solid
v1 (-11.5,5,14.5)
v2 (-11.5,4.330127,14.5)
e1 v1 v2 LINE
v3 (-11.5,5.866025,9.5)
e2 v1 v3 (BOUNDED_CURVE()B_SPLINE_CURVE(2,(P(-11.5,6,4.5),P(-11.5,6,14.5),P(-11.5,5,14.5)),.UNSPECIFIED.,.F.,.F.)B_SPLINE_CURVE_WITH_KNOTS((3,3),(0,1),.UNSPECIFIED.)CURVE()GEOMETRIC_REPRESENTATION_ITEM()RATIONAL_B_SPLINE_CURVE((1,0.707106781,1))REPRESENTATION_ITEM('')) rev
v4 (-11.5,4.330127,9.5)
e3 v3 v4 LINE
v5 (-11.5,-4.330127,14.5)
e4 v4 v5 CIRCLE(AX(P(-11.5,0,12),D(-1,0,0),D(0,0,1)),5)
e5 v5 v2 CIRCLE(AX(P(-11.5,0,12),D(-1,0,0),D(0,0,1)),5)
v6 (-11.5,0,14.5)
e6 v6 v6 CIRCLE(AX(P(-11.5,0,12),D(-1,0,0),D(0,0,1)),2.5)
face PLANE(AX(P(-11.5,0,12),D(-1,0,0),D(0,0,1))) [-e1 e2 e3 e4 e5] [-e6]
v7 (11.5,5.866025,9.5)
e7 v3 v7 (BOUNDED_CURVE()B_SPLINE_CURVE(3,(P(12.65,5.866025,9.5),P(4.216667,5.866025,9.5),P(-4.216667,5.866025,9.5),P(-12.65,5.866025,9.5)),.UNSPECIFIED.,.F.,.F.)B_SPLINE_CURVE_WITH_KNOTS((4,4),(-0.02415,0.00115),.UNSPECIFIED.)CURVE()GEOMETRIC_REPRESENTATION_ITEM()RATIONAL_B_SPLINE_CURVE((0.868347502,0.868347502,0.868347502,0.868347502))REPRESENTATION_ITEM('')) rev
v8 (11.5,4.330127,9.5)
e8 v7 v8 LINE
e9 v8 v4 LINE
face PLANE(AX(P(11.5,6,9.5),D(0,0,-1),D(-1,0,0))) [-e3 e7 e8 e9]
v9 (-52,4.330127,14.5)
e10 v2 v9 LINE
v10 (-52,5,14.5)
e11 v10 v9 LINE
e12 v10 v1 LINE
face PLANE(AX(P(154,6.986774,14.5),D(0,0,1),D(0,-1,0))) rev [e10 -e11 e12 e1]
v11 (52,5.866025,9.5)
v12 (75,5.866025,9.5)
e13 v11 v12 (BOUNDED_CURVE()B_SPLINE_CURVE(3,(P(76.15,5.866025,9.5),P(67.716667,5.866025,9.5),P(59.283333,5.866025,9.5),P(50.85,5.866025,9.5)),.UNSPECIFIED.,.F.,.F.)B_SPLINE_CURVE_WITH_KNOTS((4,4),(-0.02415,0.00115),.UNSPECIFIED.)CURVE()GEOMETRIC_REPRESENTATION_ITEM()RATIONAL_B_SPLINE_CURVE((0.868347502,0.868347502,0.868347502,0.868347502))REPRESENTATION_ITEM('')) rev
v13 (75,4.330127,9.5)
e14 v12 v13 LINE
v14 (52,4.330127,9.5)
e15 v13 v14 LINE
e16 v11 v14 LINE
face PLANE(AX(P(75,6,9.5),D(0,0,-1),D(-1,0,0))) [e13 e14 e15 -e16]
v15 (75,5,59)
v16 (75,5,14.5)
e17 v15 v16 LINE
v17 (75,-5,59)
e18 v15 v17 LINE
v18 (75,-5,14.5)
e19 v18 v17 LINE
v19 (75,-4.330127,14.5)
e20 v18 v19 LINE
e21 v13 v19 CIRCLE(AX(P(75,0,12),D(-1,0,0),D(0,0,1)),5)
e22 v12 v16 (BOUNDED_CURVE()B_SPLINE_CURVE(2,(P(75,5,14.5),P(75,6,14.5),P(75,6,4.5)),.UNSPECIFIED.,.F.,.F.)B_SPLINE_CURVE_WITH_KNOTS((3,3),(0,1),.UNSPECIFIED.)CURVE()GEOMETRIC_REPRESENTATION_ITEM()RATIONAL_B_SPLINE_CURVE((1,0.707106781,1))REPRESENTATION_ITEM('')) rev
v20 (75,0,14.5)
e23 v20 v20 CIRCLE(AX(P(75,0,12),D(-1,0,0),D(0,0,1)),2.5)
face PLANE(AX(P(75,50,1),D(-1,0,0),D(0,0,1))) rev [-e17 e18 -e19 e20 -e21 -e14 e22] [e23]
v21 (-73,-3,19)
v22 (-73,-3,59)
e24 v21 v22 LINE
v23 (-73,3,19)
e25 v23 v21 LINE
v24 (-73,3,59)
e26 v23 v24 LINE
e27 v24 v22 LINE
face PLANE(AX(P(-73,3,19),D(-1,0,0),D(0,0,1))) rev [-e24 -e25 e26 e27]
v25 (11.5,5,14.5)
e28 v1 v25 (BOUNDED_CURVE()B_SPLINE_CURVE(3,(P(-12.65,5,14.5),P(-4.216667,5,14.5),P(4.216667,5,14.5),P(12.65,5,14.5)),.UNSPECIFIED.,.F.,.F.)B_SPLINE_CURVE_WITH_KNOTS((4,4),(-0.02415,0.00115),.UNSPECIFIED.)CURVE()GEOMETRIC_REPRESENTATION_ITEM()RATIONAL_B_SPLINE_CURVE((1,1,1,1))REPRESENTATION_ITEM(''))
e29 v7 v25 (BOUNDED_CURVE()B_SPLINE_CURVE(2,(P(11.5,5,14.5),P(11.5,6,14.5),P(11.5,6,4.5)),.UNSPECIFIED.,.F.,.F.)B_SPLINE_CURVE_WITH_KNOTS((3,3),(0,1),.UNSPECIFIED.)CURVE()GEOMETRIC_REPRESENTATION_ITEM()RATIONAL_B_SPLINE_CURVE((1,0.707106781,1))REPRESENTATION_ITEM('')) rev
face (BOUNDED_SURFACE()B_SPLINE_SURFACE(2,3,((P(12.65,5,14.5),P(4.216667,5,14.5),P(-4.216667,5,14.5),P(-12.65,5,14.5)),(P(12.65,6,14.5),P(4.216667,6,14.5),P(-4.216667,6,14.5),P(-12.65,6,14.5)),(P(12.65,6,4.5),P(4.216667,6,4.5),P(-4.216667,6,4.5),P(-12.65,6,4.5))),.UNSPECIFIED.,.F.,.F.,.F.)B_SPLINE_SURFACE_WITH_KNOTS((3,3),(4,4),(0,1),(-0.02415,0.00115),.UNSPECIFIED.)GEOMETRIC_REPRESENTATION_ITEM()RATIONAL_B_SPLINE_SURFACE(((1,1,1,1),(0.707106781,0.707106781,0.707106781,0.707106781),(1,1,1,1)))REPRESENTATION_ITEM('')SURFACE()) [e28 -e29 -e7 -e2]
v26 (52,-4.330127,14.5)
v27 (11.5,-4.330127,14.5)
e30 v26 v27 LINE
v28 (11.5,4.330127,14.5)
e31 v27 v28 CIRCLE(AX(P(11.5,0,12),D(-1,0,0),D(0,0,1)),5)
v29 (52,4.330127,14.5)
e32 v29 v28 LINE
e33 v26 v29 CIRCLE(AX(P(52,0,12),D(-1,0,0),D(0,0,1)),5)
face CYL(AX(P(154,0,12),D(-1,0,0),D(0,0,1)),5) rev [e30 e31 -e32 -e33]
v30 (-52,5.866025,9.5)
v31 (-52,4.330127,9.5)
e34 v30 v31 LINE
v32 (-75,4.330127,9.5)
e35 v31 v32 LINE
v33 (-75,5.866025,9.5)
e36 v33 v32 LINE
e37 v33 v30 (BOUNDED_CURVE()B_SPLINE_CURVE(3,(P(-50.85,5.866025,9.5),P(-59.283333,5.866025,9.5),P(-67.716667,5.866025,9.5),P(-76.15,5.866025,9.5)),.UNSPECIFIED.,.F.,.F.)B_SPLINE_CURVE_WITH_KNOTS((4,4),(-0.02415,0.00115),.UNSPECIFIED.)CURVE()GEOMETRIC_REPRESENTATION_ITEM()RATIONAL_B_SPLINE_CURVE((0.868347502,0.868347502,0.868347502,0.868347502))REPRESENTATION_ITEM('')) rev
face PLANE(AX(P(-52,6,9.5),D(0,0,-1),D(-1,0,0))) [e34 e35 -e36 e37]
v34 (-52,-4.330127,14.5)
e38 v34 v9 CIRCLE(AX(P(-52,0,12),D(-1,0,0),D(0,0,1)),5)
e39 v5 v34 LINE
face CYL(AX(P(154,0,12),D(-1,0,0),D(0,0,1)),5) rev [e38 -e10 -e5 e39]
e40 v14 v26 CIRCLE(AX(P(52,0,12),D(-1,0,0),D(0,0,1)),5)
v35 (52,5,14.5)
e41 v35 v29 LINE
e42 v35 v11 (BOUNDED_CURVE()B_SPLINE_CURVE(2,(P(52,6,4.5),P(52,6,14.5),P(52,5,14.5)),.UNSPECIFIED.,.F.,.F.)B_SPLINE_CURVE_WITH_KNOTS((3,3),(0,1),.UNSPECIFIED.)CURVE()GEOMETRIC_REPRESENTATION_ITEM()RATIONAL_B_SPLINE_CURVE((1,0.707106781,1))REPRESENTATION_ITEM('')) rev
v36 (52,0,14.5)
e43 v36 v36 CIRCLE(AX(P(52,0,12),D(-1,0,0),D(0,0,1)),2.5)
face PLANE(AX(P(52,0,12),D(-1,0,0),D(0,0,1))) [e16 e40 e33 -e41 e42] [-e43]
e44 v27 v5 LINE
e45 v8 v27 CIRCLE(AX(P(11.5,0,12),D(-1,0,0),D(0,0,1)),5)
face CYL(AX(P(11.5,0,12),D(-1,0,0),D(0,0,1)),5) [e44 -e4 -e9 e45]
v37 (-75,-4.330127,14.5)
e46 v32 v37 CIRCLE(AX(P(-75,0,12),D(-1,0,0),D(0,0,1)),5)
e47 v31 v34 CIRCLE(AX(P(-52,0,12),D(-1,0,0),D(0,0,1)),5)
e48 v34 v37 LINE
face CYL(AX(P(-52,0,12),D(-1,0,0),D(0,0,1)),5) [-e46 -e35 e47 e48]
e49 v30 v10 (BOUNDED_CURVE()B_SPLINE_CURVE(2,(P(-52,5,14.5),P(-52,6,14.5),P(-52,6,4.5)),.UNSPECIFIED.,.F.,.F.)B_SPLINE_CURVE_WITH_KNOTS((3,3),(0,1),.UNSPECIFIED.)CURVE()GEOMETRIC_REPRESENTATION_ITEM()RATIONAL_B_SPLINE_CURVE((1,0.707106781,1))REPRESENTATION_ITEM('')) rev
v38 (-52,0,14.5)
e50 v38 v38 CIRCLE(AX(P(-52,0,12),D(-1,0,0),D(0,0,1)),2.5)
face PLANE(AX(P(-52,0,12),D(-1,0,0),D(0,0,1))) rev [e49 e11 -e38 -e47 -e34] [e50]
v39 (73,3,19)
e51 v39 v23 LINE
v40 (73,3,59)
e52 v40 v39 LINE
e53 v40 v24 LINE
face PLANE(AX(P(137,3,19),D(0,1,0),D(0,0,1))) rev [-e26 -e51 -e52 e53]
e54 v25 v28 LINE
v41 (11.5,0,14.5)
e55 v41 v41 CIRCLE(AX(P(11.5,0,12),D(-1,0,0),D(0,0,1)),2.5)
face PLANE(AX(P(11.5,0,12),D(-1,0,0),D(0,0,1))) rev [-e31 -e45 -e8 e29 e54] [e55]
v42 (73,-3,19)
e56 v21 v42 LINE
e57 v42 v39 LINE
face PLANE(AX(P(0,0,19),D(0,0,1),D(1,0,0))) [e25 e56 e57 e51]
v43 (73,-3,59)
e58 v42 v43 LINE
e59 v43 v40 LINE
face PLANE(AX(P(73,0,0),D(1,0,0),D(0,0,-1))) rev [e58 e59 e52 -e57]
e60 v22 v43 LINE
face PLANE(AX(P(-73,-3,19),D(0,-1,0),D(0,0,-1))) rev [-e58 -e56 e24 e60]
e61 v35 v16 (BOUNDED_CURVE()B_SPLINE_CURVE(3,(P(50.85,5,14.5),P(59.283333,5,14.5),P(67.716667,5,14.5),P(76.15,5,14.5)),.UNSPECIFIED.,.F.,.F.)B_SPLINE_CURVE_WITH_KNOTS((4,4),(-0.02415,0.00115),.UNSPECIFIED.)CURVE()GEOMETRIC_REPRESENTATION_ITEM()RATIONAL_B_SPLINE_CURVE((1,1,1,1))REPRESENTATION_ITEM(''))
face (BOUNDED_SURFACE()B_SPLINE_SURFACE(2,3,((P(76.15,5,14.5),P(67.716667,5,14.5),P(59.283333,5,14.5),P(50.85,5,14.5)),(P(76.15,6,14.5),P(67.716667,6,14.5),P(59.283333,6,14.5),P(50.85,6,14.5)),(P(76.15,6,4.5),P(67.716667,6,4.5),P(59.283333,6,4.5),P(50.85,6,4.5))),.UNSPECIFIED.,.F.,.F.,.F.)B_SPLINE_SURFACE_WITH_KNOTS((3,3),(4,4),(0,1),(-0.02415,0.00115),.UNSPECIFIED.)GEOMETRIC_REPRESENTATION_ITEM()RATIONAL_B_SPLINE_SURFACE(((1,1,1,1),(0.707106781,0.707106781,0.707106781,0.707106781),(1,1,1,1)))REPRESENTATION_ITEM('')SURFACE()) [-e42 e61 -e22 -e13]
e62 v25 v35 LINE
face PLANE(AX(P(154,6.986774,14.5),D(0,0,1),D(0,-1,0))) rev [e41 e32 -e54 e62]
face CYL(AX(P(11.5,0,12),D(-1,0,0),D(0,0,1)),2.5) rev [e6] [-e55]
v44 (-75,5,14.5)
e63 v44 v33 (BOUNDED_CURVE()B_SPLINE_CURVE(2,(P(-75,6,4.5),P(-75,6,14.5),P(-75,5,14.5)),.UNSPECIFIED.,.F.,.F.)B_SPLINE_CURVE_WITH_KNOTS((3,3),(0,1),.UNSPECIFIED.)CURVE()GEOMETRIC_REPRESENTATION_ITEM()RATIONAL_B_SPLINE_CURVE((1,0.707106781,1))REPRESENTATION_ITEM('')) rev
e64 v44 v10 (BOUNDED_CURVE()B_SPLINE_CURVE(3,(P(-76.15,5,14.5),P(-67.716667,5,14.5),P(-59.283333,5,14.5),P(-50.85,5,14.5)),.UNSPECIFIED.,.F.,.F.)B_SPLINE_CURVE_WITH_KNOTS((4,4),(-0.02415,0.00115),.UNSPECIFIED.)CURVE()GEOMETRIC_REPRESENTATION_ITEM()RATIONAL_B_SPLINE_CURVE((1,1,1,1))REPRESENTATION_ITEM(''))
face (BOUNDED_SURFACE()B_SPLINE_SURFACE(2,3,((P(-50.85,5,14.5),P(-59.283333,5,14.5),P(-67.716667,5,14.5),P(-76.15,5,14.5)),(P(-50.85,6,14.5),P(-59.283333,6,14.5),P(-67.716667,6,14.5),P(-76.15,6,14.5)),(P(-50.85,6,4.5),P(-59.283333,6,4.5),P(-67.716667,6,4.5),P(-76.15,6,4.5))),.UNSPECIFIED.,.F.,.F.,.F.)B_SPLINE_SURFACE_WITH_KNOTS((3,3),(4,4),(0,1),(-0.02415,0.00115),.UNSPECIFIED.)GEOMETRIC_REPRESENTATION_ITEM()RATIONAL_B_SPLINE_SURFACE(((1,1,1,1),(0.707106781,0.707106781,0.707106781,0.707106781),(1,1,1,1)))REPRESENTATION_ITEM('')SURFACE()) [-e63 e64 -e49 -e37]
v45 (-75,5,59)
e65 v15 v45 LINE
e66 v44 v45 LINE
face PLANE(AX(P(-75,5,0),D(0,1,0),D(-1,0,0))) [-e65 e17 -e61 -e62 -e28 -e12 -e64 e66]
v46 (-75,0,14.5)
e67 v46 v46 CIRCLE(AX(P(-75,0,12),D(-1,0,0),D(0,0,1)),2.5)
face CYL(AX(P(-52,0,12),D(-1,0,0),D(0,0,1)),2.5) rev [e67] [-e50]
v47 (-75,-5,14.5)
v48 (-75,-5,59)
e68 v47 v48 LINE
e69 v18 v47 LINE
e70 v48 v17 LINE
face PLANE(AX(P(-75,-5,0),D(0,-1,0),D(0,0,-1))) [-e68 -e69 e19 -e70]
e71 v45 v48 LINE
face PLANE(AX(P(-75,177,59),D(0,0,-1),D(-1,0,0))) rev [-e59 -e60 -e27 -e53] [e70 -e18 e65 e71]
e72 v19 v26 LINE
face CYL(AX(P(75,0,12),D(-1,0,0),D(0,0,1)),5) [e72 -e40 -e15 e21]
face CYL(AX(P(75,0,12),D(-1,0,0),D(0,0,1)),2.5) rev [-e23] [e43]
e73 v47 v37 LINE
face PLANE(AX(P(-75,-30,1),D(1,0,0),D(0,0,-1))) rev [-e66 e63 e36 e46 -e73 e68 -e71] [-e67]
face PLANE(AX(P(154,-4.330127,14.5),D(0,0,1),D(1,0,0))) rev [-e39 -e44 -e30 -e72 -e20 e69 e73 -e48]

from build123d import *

# Parameters (mm, degrees)
BOSS_EXTRUDE1_DEPTH             = 1
BOSS_EXTRUDE5_DEPTH             = 100
BOSS_EXTRUDE5_DEPTH_BACK        = 1
SKETCH2_W                       = 214
SKETCH2_H                       = 10
FILLET3_SIZE                    = 15
FILLET3_SIZE_2                  = 10
CUT_EXTRUDE2_DEPTH              = 229
SKETCH7_W                       = 64
SKETCH7_H                       = 10
CUT_EXTRUDE3_DEPTH              = 14
SKETCH11_R                      = 5
SKETCH11_R_2                    = 2.5
EXTRUDE_THIN4_DEPTH             = 23
EXTRUDE_THIN5_START             = -63.5
SKETCH11_2_R                    = 5
SKETCH11_2_R_2                  = 2.5
EXTRUDE_THIN5_DEPTH             = 23
EXTRUDE_THIN6_START             = -127
SKETCH11_3_R                    = 5
SKETCH11_3_R_2                  = 2.5
EXTRUDE_THIN6_DEPTH             = 23
SKETCH12_W                      = 210
SKETCH12_H                      = 6
CUT_EXTRUDE4_DEPTH              = 82
CUT_EXTRUDE5_DEPTH              = 180
SKETCH14_W                      = 83.209760426
SKETCH14_H                      = 10
BOSS_EXTRUDE6_DEPTH             = 2
SKETCH15_W                      = 1.646756057
SKETCH15_H                      = 0.570147936
SKETCH15_W_2                    = 1.681570062
SKETCH15_H_2                    = 0.299582691
CUT_EXTRUDE6_DEPTH              = 182
SKETCH16_W                      = 150
SKETCH16_H                      = 42
CUT_EXTRUDE7_DEPTH              = 182
BOSS_EXTRUDE7_REACH             = 107.948
BOSS_EXTRUDE7_END_RADIUS        = 5
BOSS_EXTRUDE7_START             = -10
SKETCH17_W                      = 23
SKETCH17_H                      = 5
BOSS_EXTRUDE7_DIRECTION_2_DEPTH = 1
FILLET5_SIZE                    = 10
FILLET5_SIZE_2                  = 1


with BuildPart() as part:
    # Sketch1 → Boss-Extrude1 (new body)
    with BuildSketch(Plane.XY):
        Polygon((75, 50), (75, -50), (-75, -30), (-75, 30), align=None)
    extrude(amount=BOSS_EXTRUDE1_DEPTH)

    # Sketch2 → Boss-Extrude5 (add, two sides: drawn at the far end of the back side and taken through both)
    with BuildSketch(Plane.XY.offset(1).offset(-BOSS_EXTRUDE5_DEPTH_BACK)):
        with Locations((32, 0)):
            Rectangle(SKETCH2_W, SKETCH2_H)
    extrude(amount=BOSS_EXTRUDE5_DEPTH + BOSS_EXTRUDE5_DEPTH_BACK)

    # Fillet3
    # an asymmetric fillet: 15, 10 mm, written as the material it adds along each edge
    with BuildSketch(Plane(origin=(75, -5, 1), x_dir=(0, 0, 1), z_dir=(-1, 0, 0))) as fillet3_piece_1:
        with BuildLine():
            Bezier((FILLET3_SIZE, 0), (0, 0), (0, -FILLET3_SIZE_2), weights=[1, 0.707106781, 1])
            Line((0, -FILLET3_SIZE_2), (0, 0))
            Line((0, 0), (FILLET3_SIZE, 0))
        make_face()
    extrude(amount=150)
    with BuildSketch(Plane(origin=(-75, 5, 1), x_dir=(0, 1, 0), z_dir=(1, 0, 0))) as fillet3_piece_2:
        with BuildLine():
            Bezier((FILLET3_SIZE_2, 0), (0, 0), (0, FILLET3_SIZE), weights=[1, 0.707106781, 1])
            Line((0, FILLET3_SIZE), (0, 0))
            Line((0, 0), (FILLET3_SIZE_2, 0))
        make_face()
    extrude(amount=150)

    # Sketch6 → Cut-Extrude2 (cut)
    with BuildSketch(Plane.ZY.offset(75)):
        with BuildLine():
            Line((9.5, 6.986773712), (9.5, 4.330127019))
            ThreePointArc((9.5, 4.330127019), (7, 0), (9.5, -4.330127019))
            Line((9.5, -4.330127019), (9.5, -7.297871365))
            Line((9.5, -7.297871365), (14.5, -7.297871365))
            Line((14.5, -7.297871365), (14.5, -4.330127019))
            ThreePointArc((14.5, -4.330127019), (17, 0), (14.5, 4.330127019))
            Line((14.5, 4.330127019), (14.5, 6.986773712))
            Line((14.5, 6.986773712), (9.5, 6.986773712))
        make_face()
    extrude(amount=-CUT_EXTRUDE2_DEPTH, mode=Mode.SUBTRACT)


with BuildPart() as cut_extrude2_piece_1:
    # of the separate pieces the step leaves, piece 1, a body of its own (cut_extrude2_pieces)
    add(part.part.solids().sort_by_distance((-75, 5.050125629, 14.5))[0])

    # Sketch11 → Extrude-Thin4 (add)
    with BuildSketch(Plane.ZY.offset(75)):
        with Locations((12, 0)):
            Circle(SKETCH11_R)
        with Locations((12, 0)):
            Circle(SKETCH11_R_2, mode=Mode.SUBTRACT)
    extrude(amount=-EXTRUDE_THIN4_DEPTH)

    # Sketch11<2> → Extrude-Thin5 (add)
    with BuildSketch(Plane.ZY.offset(75).offset(EXTRUDE_THIN5_START)):
        with Locations((12, 0)):
            Circle(SKETCH11_2_R)
        with Locations((12, 0)):
            Circle(SKETCH11_2_R_2, mode=Mode.SUBTRACT)
    extrude(amount=-EXTRUDE_THIN5_DEPTH)

    # Sketch11<3> → Extrude-Thin6 (add)
    with BuildSketch(Plane.ZY.offset(75).offset(EXTRUDE_THIN6_START)):
        with Locations((12, 0)):
            Circle(SKETCH11_3_R)
        with Locations((12, 0)):
            Circle(SKETCH11_3_R_2, mode=Mode.SUBTRACT)
    extrude(amount=-EXTRUDE_THIN6_DEPTH)

    # Sketch12 → Cut-Extrude4 (cut)
    with BuildSketch(Plane.XY.offset(101)):
        with Locations((32, 0)):
            Rectangle(SKETCH12_W, SKETCH12_H)
    extrude(amount=-CUT_EXTRUDE4_DEPTH, mode=Mode.SUBTRACT)

    # Sketch13 → Cut-Extrude5 (cut)
    with BuildSketch(Plane.XY):
        Polygon((75, 14.806657355), (75, -17.321011219), (144.128197091, -17.321011219), (144.128197091, 20.114706945), (75, 18.438480759), align=None)
    extrude(amount=CUT_EXTRUDE5_DEPTH, mode=Mode.SUBTRACT)

    # Sketch14 → Boss-Extrude6 (add)
    with BuildSketch(Plane(origin=(75, 0, 0), x_dir=(0, 0, -1), z_dir=(1, 0, 0))):
        with Locations((-59.395119787, 0)):
            Rectangle(SKETCH14_W, SKETCH14_H)
    extrude(amount=-BOSS_EXTRUDE6_DEPTH)

    # Sketch15 → Cut-Extrude6 (cut)
    with BuildSketch(Plane(origin=(75, 0, 0), x_dir=(0, 0, -1), z_dir=(1, 0, 0))):
        with Locations((-15.176621972, 5.285073968)):
            Rectangle(SKETCH15_W, SKETCH15_H)
        with Locations((-15.159214969, -5.149791346)):
            Rectangle(SKETCH15_W_2, SKETCH15_H_2)
    extrude(amount=-CUT_EXTRUDE6_DEPTH, mode=Mode.SUBTRACT)

    # Sketch16 → Cut-Extrude7 (cut)
    with BuildSketch(Plane(origin=(0, -5, 0), x_dir=(-1, 0, 0), z_dir=(0, -1, 0))):
        with Locations((0, -80)):
            Rectangle(SKETCH16_W, SKETCH16_H)
    extrude(amount=-CUT_EXTRUDE7_DEPTH, mode=Mode.SUBTRACT)

    # Boss-Extrude7: up to this cylinder (the profile starts outside it)
    boss_extrude7_end = Plane(origin=(0, 0, 12), z_dir=(-1, 0, 0)) * Cylinder(BOSS_EXTRUDE7_END_RADIUS, 353.896, mode=Mode.PRIVATE)
    # Sketch17 → Boss-Extrude7 (add, up to the surface)
    with BuildSketch(Plane.XZ.offset(5).offset(BOSS_EXTRUDE7_START), mode=Mode.PRIVATE) as boss_extrude7_sk1:
        with Locations((63.5, 12)):
            Rectangle(SKETCH17_W, SKETCH17_H)
    boss_extrude7_tool1 = extrude(boss_extrude7_sk1.sketch, amount=BOSS_EXTRUDE7_REACH, mode=Mode.PRIVATE) - boss_extrude7_end
    add(boss_extrude7_tool1.solids().sort_by_distance((63.5, 5, 12))[0])
    add(boss_extrude7_tool1.solids().sort_by_distance((63.5, 5, 12))[1])
    # Sketch17 → Boss-Extrude7 (add, up to the surface)
    with BuildSketch(Plane.XZ.offset(5).offset(BOSS_EXTRUDE7_START), mode=Mode.PRIVATE) as boss_extrude7_sk2:
        with Locations((0, 12)):
            Rectangle(SKETCH17_W, SKETCH17_H)
    boss_extrude7_tool2 = extrude(boss_extrude7_sk2.sketch, amount=BOSS_EXTRUDE7_REACH, mode=Mode.PRIVATE) - boss_extrude7_end
    add(boss_extrude7_tool2.solids().sort_by_distance((0, 5, 12))[0])
    add(boss_extrude7_tool2.solids().sort_by_distance((0, 5, 12))[1])
    # Sketch17 → Boss-Extrude7 (add, up to the surface)
    with BuildSketch(Plane.XZ.offset(5).offset(BOSS_EXTRUDE7_START), mode=Mode.PRIVATE) as boss_extrude7_sk3:
        with Locations((-63.5, 12)):
            Rectangle(SKETCH17_W, SKETCH17_H)
    boss_extrude7_tool3 = extrude(boss_extrude7_sk3.sketch, amount=BOSS_EXTRUDE7_REACH, mode=Mode.PRIVATE) - boss_extrude7_end
    add(boss_extrude7_tool3.solids().sort_by_distance((-63.5, 5, 12))[0])
    add(boss_extrude7_tool3.solids().sort_by_distance((-63.5, 5, 12))[1])

    # Sketch17 → Boss-Extrude7 direction 2 (add)
    with BuildSketch(Plane.XZ.offset(5).offset(BOSS_EXTRUDE7_START)):
        with Locations((63.5, 12)):
            Rectangle(SKETCH17_W, SKETCH17_H)
        with Locations((0, 12)):
            Rectangle(SKETCH17_W, SKETCH17_H)
        with Locations((-63.5, 12)):
            Rectangle(SKETCH17_W, SKETCH17_H)
    extrude(amount=-BOSS_EXTRUDE7_DIRECTION_2_DEPTH)

    # Fillet5
    # an asymmetric fillet: 10, 1 mm, written as the material it takes off along each edge
    with BuildSketch(Plane(origin=(-100, 6, 14.5), x_dir=(0, 0, -1), z_dir=(1, 0, 0)), Plane(origin=(-36.5, 6, 14.5), x_dir=(0, 0, -1), z_dir=(1, 0, 0)), Plane(origin=(27, 6, 14.5), x_dir=(0, 0, -1), z_dir=(1, 0, 0))) as fillet5_piece_1:
        with BuildLine():
            Bezier((FILLET5_SIZE, 0), (0, 0), (0, -FILLET5_SIZE_2), weights=[1, 0.707106781, 1])
            Line((0, -FILLET5_SIZE_2), (0, 0))
            Line((0, 0), (FILLET5_SIZE, 0))
        make_face()
    extrude(amount=73, mode=Mode.SUBTRACT)


with BuildPart() as cut_extrude2_piece_2:
    # of the separate pieces the step leaves, piece 2, a body of its own (cut_extrude2_pieces)
    add(part.part.solids().sort_by_distance((-75, 15, 1))[0])

    # Sketch7 → Cut-Extrude3 (cut)
    with BuildSketch(Plane(origin=(0, 0, 0), x_dir=(-1, 0, 0), z_dir=(0, 0, -1))):
        with Locations((-107, 0)):
            Rectangle(SKETCH7_W, SKETCH7_H)
    extrude(amount=-CUT_EXTRUDE3_DEPTH, mode=Mode.SUBTRACT)


solid = cut_extrude2_piece_1.part
